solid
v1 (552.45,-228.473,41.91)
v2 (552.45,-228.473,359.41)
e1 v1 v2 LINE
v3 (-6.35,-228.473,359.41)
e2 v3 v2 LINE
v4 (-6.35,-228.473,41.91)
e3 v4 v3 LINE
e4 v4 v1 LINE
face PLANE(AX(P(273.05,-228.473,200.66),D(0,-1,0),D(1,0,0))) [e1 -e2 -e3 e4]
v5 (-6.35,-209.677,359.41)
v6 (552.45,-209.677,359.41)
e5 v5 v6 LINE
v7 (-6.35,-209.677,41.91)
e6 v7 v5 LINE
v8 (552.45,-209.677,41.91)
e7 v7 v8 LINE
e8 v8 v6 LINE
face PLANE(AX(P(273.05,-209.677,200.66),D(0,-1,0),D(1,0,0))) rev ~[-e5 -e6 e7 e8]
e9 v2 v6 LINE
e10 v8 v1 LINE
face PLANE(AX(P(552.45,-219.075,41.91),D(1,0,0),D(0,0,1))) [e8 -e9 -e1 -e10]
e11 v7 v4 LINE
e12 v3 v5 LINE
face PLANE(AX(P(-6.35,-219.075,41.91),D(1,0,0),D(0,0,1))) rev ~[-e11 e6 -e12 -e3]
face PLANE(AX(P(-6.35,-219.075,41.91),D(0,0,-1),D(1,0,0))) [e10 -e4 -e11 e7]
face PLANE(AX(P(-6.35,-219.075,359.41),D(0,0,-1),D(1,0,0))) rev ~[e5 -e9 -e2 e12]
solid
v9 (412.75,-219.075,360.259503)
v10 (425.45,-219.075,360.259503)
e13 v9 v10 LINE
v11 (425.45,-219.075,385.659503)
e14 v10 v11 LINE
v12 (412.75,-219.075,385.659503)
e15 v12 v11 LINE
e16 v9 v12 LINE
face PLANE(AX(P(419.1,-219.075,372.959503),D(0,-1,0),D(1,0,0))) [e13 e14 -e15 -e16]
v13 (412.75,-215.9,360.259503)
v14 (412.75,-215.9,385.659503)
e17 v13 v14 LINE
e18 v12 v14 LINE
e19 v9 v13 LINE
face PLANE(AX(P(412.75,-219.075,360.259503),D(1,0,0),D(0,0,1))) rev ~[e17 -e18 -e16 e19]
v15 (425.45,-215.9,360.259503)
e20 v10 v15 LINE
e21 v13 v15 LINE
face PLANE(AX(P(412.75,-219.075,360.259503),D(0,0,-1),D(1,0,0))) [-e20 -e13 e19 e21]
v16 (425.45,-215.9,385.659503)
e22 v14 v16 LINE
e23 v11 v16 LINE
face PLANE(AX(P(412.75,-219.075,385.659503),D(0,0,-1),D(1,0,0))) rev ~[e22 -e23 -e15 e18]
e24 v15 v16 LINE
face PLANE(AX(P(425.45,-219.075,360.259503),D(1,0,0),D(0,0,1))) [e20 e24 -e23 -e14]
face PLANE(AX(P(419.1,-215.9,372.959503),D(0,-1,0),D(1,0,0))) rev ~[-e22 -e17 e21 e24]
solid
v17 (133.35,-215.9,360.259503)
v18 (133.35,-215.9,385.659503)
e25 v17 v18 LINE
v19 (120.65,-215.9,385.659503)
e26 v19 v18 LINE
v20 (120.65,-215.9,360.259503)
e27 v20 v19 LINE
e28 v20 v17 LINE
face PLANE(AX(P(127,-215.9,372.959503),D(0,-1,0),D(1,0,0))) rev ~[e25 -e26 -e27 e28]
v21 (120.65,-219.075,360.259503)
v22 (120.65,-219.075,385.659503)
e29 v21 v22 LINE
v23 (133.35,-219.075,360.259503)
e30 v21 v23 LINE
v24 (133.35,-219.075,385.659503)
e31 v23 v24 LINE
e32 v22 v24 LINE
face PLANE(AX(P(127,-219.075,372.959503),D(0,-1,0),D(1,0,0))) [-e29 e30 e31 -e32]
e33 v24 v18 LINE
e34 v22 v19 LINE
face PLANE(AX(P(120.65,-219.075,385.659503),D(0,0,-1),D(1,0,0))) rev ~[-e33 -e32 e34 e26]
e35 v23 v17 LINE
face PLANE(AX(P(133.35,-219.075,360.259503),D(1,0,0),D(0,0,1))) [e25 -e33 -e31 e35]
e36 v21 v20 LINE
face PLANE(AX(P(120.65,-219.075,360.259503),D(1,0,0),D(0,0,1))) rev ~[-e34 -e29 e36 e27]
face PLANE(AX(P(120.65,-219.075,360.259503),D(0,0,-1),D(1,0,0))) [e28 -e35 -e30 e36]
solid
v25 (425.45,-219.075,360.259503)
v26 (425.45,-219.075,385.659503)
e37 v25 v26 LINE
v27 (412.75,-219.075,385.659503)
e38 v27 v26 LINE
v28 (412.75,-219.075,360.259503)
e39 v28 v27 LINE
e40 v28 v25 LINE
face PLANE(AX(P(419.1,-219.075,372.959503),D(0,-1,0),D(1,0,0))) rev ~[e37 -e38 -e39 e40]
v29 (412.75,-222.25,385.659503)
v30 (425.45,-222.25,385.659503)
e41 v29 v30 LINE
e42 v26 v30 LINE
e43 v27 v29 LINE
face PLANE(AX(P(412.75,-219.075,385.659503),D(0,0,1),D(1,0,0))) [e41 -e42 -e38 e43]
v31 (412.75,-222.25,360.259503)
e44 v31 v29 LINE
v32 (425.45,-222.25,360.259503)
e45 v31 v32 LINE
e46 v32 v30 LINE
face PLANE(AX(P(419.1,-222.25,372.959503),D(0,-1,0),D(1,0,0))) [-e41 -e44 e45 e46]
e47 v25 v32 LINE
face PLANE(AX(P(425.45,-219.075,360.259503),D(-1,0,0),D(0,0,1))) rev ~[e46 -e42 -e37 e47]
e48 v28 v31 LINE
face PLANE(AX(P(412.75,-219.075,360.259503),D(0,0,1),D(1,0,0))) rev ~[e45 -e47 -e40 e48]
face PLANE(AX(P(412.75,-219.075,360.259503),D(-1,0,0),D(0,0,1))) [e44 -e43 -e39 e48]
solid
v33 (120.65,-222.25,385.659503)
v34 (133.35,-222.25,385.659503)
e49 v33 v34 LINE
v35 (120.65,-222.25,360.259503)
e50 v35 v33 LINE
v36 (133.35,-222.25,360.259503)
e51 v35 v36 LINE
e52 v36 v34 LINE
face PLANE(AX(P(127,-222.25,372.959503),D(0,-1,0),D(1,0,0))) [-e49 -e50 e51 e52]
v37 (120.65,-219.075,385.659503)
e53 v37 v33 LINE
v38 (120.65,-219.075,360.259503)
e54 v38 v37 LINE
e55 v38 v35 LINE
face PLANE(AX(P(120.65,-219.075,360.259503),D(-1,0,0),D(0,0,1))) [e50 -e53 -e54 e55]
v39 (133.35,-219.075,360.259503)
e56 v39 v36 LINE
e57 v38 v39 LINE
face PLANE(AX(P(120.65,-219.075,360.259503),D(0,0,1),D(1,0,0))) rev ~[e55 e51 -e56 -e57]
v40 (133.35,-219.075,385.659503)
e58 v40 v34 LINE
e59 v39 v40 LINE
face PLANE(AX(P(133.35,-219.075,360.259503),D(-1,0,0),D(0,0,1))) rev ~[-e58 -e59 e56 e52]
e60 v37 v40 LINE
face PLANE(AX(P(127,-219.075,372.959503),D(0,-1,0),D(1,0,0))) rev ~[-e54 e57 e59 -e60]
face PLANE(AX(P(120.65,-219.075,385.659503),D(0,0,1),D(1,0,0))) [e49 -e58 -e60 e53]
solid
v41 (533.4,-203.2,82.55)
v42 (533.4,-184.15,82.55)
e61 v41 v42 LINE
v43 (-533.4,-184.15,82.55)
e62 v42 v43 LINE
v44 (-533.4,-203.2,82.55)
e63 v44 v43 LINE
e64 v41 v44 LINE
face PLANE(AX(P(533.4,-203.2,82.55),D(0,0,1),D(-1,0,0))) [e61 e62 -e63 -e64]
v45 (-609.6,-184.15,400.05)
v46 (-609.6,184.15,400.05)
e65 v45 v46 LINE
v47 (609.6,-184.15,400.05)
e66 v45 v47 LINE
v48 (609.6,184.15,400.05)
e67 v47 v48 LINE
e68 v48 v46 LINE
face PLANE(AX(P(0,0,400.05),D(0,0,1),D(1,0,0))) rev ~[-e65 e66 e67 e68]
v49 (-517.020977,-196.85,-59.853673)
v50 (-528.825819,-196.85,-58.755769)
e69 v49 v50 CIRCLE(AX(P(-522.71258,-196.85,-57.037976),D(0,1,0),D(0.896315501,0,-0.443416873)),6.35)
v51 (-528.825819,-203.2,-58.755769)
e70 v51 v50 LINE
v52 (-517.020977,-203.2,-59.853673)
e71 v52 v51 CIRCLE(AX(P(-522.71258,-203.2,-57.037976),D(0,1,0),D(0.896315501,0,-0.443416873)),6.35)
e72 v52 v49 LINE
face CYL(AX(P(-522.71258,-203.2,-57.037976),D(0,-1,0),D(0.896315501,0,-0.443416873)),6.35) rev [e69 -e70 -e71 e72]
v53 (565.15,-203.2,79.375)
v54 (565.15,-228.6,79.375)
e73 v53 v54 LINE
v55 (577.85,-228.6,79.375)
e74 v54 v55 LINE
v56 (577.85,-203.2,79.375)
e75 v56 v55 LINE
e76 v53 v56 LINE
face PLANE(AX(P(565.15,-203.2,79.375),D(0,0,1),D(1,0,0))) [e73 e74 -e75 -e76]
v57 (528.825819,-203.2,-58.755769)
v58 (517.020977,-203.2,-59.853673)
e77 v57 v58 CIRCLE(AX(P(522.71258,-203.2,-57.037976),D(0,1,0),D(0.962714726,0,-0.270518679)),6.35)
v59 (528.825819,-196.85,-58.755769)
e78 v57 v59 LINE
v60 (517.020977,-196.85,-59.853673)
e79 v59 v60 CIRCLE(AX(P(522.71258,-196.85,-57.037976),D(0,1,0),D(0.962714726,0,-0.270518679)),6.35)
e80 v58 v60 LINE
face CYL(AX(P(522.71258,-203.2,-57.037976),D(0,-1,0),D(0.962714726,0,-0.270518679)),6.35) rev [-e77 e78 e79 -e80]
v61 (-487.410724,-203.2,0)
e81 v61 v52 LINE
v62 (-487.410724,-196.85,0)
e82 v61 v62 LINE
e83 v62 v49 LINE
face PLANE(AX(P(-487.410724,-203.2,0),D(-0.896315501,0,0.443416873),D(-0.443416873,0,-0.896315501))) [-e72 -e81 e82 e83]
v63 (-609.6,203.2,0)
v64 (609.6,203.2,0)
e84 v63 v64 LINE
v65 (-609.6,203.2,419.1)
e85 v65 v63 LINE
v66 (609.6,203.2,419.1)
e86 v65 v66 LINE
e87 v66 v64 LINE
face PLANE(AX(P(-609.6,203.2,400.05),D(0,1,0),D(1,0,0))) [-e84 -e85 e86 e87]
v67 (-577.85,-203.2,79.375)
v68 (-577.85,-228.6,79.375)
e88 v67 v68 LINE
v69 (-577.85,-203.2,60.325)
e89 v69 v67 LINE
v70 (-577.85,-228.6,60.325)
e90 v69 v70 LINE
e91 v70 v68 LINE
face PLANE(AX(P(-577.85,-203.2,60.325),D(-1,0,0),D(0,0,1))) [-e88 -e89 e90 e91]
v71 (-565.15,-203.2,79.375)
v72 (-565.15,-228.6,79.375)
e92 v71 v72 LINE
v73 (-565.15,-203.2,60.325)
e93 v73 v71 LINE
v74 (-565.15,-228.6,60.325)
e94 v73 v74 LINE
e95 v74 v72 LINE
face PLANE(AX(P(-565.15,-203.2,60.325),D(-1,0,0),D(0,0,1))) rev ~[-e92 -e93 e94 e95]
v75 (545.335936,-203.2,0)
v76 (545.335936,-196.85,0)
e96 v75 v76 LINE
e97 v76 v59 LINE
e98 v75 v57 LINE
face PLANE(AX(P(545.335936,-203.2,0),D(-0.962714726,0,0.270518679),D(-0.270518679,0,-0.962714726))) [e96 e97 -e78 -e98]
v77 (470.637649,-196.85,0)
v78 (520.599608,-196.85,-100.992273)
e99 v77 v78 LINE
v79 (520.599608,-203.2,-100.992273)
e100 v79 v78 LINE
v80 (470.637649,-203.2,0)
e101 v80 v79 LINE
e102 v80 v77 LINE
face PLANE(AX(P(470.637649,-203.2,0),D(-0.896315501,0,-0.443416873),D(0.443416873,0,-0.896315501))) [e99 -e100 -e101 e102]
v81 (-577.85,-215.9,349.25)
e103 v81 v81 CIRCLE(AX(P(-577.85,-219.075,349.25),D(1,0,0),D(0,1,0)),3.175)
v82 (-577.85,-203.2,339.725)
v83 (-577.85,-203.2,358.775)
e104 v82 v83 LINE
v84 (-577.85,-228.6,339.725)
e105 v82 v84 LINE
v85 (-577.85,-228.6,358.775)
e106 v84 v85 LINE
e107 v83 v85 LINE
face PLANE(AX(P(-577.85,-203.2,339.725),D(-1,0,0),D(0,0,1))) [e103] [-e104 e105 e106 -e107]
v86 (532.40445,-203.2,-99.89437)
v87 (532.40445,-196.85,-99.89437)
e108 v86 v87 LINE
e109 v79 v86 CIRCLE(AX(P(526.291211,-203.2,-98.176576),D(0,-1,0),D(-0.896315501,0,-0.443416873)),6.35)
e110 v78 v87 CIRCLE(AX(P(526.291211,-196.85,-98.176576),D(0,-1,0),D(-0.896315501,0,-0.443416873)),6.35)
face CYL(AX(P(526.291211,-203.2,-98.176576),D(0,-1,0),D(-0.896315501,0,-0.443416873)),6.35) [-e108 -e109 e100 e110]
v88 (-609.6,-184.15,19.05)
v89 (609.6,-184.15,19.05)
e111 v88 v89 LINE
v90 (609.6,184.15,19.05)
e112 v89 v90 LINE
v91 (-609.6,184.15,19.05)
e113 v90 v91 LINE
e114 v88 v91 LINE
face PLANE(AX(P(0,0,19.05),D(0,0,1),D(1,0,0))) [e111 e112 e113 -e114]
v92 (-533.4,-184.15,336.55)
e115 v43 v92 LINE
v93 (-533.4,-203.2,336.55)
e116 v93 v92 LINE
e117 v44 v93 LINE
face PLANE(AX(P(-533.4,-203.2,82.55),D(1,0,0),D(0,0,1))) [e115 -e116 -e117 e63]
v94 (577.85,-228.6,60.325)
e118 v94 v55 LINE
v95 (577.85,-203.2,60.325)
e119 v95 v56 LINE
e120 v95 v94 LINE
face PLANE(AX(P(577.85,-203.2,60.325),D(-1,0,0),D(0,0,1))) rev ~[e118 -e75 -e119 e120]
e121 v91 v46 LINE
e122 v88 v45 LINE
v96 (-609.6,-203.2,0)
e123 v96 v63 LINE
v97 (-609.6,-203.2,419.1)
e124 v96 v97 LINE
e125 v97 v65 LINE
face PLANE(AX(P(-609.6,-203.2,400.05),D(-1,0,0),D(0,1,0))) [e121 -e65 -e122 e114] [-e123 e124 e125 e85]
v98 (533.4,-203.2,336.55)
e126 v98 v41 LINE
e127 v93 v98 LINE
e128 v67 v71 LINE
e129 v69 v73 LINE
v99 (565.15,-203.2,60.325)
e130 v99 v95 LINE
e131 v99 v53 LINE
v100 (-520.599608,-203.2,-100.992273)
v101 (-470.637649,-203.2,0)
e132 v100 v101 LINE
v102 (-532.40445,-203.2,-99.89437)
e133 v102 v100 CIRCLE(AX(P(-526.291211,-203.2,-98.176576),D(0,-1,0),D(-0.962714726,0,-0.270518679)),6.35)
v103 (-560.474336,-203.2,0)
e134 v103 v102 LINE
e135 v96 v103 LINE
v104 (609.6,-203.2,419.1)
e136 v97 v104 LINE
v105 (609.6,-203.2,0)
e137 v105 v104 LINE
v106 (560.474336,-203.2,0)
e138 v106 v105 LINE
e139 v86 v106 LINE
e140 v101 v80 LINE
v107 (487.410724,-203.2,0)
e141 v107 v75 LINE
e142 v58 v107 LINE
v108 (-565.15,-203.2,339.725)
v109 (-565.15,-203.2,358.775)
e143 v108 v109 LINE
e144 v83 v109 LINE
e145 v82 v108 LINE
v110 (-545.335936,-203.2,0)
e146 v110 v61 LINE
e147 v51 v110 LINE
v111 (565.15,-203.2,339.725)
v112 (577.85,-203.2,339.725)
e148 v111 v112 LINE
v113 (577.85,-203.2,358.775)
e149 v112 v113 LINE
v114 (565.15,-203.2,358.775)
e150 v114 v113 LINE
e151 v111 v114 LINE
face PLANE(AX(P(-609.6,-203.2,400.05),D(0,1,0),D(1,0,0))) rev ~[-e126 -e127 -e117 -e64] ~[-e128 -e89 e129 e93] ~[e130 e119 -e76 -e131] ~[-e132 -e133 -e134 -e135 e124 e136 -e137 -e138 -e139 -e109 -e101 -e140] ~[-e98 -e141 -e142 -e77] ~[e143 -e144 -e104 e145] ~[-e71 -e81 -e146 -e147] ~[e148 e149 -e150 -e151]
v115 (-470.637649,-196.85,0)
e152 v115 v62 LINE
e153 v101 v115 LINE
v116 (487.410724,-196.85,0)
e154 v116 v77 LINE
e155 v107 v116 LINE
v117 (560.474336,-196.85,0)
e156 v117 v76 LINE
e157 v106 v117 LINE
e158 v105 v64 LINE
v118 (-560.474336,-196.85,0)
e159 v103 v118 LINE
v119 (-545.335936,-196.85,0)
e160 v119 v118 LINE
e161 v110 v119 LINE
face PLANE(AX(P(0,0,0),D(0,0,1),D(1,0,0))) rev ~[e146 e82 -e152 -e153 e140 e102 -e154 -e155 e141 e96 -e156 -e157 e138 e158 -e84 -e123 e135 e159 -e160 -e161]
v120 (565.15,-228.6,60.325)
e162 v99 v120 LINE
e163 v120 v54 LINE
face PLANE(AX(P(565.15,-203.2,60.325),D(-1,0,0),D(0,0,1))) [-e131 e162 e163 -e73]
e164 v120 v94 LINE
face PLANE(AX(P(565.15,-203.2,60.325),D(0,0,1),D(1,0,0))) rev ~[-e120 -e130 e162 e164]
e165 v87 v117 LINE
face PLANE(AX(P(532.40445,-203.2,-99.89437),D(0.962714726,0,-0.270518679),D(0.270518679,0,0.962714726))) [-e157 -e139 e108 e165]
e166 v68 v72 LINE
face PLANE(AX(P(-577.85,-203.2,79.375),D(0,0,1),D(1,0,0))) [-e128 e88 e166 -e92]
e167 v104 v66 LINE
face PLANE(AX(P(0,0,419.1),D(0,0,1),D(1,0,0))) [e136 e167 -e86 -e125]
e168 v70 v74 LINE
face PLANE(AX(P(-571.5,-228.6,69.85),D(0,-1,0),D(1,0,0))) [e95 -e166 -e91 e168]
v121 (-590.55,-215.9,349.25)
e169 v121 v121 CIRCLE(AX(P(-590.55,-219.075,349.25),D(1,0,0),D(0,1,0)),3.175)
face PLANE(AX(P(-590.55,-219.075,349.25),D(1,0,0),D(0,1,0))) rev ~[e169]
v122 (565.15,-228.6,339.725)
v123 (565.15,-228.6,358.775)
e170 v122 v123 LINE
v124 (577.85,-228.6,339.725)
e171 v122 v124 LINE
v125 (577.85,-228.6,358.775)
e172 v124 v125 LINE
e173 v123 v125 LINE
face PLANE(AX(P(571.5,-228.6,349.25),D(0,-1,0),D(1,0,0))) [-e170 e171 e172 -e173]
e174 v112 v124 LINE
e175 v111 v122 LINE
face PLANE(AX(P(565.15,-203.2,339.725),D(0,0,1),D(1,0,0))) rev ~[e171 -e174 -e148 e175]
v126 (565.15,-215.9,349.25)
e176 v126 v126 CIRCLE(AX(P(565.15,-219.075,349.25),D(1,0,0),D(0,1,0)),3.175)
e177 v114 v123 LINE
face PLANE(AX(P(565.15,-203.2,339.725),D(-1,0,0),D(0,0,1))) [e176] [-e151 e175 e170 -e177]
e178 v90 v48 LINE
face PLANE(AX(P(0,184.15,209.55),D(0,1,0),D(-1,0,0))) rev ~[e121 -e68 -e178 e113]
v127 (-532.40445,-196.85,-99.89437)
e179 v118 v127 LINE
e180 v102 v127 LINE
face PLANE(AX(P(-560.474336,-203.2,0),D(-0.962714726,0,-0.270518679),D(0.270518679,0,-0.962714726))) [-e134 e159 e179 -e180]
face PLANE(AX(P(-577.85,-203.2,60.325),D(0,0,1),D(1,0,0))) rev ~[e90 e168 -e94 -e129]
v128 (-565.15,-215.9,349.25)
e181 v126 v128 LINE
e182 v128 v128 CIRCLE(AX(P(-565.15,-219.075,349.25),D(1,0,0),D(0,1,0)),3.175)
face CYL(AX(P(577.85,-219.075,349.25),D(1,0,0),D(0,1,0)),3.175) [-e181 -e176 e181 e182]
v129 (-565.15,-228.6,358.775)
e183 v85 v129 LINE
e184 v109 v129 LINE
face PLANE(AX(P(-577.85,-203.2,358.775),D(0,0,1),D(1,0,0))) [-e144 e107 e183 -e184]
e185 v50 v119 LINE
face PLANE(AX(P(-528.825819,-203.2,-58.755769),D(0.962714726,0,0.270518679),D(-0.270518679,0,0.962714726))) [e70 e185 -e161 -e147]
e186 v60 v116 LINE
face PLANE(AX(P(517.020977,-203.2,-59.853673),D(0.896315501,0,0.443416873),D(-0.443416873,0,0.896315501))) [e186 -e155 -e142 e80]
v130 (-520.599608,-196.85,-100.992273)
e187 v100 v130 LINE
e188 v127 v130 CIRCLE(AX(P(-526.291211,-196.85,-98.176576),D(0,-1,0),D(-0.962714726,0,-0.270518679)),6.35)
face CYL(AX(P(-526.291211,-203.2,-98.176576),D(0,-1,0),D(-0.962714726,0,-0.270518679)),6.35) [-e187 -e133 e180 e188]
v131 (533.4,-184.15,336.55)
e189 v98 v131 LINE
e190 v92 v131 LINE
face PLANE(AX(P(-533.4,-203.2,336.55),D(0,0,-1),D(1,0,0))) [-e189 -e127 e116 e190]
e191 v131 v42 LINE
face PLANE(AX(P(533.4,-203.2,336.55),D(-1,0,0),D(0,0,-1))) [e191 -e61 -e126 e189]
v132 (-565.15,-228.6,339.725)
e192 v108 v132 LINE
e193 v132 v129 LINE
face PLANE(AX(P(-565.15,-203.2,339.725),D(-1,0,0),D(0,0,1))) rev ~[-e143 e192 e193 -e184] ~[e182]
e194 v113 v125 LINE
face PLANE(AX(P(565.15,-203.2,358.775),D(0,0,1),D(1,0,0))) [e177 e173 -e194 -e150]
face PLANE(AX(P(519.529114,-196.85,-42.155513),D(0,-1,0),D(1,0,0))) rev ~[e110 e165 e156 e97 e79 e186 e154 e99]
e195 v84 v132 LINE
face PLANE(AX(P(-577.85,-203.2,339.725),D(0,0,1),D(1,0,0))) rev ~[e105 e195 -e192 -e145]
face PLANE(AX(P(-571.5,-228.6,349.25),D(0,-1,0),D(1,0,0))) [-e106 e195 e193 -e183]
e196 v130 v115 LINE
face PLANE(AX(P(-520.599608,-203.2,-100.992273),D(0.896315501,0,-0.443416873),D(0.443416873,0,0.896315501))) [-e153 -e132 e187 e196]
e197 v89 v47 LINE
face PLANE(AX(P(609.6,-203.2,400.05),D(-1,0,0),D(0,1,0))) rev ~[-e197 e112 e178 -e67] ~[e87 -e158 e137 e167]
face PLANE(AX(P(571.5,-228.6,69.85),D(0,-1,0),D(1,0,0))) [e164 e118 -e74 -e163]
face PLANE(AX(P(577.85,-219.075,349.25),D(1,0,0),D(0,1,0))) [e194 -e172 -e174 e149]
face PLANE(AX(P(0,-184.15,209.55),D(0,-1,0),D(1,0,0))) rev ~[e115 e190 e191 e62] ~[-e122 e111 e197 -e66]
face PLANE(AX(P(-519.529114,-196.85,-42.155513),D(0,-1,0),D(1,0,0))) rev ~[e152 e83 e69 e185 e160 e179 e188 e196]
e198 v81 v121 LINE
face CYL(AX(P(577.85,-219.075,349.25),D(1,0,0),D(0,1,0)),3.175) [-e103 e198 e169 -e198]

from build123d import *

# Parameters (mm, degrees)
F0_W      = 1219.2
F0_H      = 406.4
F1_DEPTH  = 19.05
F2_W      = 1219.2
F2_H      = 381
F3_DEPTH  = 19.05
F4_W      = 1219.2
F4_H      = 381
F5_DEPTH  = 19.05
F6_W      = 1219.2
F6_H      = 406.4
F7_DEPTH  = 19.05
F8_W      = 12.7
F8_H      = 19.05
F9_DEPTH  = 25.4
F10_R     = 3.175
F11_DEPTH = 1168.4
F13_W     = 558.8
F13_H     = 317.5
F14_DEPTH = 9.398
F15_DEPTH = 9.398
F16_W     = 12.7
F16_H     = 25.4
F17_DEPTH = 3.175
F18_DEPTH = 3.175
F20_DEPTH = 6.35


with BuildPart() as f1:
    # F0 (on Top) → F1 (new body)
    with BuildSketch(Plane.XY):
        Rectangle(F0_W, F0_H)
    extrude(amount=F1_DEPTH)

    # F2 (on face) → F3 (join)
    with BuildSketch(Plane.XZ.offset(203.2)):
        with Locations((0, 209.55)):
            Rectangle(F2_W, F2_H)
        Polygon((-533.4, 336.55), (533.4, 336.55), (533.4, 82.55), (-533.4, 82.55), (-533.4, 209.55), align=None, mode=Mode.SUBTRACT)
    extrude(amount=-F3_DEPTH)

    # F4 (on face) → F5 (join)
    with BuildSketch(Plane(origin=(0, 203.2, 0), x_dir=(-1, 0, 0), z_dir=(0, 1, 0))):
        with Locations((0, 209.55)):
            Rectangle(F4_W, F4_H)
    extrude(amount=-F5_DEPTH)

    # F6 (on face) → F7 (join)
    with BuildSketch(Plane.XY.offset(400.05)):
        Rectangle(F6_W, F6_H)
    extrude(amount=F7_DEPTH)

    # F8 (on face) → F9 (join)
    with BuildSketch(Plane.XZ.offset(203.2)):
        with Locations((-571.5, 349.25)):
            Rectangle(F8_W, F8_H)
        with Locations((571.5, 349.25)):
            Rectangle(F8_W, F8_H)
        with Locations((-571.5, 69.85)):
            Rectangle(F8_W, F8_H)
        with Locations((571.5, 69.85)):
            Rectangle(F8_W, F8_H)
    extrude(amount=F9_DEPTH)

    # F10 (on face) → F11 (join)
    with BuildSketch(Plane.YZ.offset(577.85)):
        with Locations((-219.075, 349.25)):
            Circle(F10_R)
    extrude(amount=-F11_DEPTH)

    # F19 (on face) → F20 (join)
    with BuildSketch(Plane.XZ.offset(203.2)):
        with BuildLine():
            Line((532.4044498456, -99.8943697167), (560.4743361473, 0))
            Line((560.4743361473, 0), (545.3359361473, 0))
            Line((545.3359361473, 0), (528.8258187923, -58.7557694178))
            ThreePointArc((528.8258187923, -58.7557694178), (523.3006211592, -63.3606894596), (517.0209768489, -59.8536729482))
            Line((517.0209768489, -59.8536729482), (487.4107241631, 0))
            Line((487.4107241631, 0), (470.6376492977, 0))
            Line((470.6376492977, 0), (520.5996079022, -100.9922732471))
            ThreePointArc((520.5996079022, -100.9922732471), (526.8792522125, -104.4992897585), (532.4044498456, -99.8943697167))
        make_face()
        with BuildLine():
            Line((-545.3359361473, 0), (-560.4743361473, 0))
            Line((-560.4743361473, 0), (-532.4044498456, -99.8943697167))
            ThreePointArc((-532.4044498456, -99.8943697167), (-526.8792522125, -104.4992897585), (-520.5996079022, -100.9922732471))
            Line((-520.5996079022, -100.9922732471), (-470.6376492977, 0))
            Line((-470.6376492977, 0), (-487.4107241631, 0))
            Line((-487.4107241631, 0), (-517.0209768489, -59.8536729482))
            ThreePointArc((-517.0209768489, -59.8536729482), (-523.3006211592, -63.3606894596), (-528.8258187923, -58.7557694178))
            Line((-528.8258187923, -58.7557694178), (-545.3359361473, 0))
        make_face()
    extrude(amount=-F20_DEPTH)


with BuildPart() as f14:
    # F13 (on offset) → F14 (new body)
    with BuildSketch(Plane.XZ.offset(219.075)):
        with Locations((273.05, 200.66)):
            Rectangle(F13_W, F13_H)
    extrude(amount=F14_DEPTH)

    # F13 (on offset) → F15 (join)
    with BuildSketch(Plane.XZ.offset(219.075)):
        with Locations((273.05, 200.66)):
            Rectangle(F13_W, F13_H)
    extrude(amount=-F15_DEPTH)


with BuildPart() as f17:
    # F16 (on offset) → F17 (new body)
    with BuildSketch(Plane.XZ.offset(219.075)):
        with Locations((127, 372.9595031261)):
            Rectangle(F16_W, F16_H)
    extrude(amount=F17_DEPTH)


with BuildPart() as f17b:
    # F16 (on offset) → F17, piece 2 (new body)
    with BuildSketch(Plane.XZ.offset(219.075)):
        with Locations((419.1, 372.9595031261)):
            Rectangle(F16_W, F16_H)
    extrude(amount=F17_DEPTH)


with BuildPart() as f18:
    # F16 (on offset) → F18 (new body)
    with BuildSketch(Plane.XZ.offset(219.075)):
        with Locations((127, 372.9595031261)):
            Rectangle(F16_W, F16_H)
    extrude(amount=-F18_DEPTH)


with BuildPart() as f18b:
    # F16 (on offset) → F18, piece 2 (new body)
    with BuildSketch(Plane.XZ.offset(219.075)):
        with Locations((419.1, 372.9595031261)):
            Rectangle(F16_W, F16_H)
    extrude(amount=-F18_DEPTH)


solid = Compound([f1.part, f14.part, f17.part, f17b.part, f18.part, f18b.part])
